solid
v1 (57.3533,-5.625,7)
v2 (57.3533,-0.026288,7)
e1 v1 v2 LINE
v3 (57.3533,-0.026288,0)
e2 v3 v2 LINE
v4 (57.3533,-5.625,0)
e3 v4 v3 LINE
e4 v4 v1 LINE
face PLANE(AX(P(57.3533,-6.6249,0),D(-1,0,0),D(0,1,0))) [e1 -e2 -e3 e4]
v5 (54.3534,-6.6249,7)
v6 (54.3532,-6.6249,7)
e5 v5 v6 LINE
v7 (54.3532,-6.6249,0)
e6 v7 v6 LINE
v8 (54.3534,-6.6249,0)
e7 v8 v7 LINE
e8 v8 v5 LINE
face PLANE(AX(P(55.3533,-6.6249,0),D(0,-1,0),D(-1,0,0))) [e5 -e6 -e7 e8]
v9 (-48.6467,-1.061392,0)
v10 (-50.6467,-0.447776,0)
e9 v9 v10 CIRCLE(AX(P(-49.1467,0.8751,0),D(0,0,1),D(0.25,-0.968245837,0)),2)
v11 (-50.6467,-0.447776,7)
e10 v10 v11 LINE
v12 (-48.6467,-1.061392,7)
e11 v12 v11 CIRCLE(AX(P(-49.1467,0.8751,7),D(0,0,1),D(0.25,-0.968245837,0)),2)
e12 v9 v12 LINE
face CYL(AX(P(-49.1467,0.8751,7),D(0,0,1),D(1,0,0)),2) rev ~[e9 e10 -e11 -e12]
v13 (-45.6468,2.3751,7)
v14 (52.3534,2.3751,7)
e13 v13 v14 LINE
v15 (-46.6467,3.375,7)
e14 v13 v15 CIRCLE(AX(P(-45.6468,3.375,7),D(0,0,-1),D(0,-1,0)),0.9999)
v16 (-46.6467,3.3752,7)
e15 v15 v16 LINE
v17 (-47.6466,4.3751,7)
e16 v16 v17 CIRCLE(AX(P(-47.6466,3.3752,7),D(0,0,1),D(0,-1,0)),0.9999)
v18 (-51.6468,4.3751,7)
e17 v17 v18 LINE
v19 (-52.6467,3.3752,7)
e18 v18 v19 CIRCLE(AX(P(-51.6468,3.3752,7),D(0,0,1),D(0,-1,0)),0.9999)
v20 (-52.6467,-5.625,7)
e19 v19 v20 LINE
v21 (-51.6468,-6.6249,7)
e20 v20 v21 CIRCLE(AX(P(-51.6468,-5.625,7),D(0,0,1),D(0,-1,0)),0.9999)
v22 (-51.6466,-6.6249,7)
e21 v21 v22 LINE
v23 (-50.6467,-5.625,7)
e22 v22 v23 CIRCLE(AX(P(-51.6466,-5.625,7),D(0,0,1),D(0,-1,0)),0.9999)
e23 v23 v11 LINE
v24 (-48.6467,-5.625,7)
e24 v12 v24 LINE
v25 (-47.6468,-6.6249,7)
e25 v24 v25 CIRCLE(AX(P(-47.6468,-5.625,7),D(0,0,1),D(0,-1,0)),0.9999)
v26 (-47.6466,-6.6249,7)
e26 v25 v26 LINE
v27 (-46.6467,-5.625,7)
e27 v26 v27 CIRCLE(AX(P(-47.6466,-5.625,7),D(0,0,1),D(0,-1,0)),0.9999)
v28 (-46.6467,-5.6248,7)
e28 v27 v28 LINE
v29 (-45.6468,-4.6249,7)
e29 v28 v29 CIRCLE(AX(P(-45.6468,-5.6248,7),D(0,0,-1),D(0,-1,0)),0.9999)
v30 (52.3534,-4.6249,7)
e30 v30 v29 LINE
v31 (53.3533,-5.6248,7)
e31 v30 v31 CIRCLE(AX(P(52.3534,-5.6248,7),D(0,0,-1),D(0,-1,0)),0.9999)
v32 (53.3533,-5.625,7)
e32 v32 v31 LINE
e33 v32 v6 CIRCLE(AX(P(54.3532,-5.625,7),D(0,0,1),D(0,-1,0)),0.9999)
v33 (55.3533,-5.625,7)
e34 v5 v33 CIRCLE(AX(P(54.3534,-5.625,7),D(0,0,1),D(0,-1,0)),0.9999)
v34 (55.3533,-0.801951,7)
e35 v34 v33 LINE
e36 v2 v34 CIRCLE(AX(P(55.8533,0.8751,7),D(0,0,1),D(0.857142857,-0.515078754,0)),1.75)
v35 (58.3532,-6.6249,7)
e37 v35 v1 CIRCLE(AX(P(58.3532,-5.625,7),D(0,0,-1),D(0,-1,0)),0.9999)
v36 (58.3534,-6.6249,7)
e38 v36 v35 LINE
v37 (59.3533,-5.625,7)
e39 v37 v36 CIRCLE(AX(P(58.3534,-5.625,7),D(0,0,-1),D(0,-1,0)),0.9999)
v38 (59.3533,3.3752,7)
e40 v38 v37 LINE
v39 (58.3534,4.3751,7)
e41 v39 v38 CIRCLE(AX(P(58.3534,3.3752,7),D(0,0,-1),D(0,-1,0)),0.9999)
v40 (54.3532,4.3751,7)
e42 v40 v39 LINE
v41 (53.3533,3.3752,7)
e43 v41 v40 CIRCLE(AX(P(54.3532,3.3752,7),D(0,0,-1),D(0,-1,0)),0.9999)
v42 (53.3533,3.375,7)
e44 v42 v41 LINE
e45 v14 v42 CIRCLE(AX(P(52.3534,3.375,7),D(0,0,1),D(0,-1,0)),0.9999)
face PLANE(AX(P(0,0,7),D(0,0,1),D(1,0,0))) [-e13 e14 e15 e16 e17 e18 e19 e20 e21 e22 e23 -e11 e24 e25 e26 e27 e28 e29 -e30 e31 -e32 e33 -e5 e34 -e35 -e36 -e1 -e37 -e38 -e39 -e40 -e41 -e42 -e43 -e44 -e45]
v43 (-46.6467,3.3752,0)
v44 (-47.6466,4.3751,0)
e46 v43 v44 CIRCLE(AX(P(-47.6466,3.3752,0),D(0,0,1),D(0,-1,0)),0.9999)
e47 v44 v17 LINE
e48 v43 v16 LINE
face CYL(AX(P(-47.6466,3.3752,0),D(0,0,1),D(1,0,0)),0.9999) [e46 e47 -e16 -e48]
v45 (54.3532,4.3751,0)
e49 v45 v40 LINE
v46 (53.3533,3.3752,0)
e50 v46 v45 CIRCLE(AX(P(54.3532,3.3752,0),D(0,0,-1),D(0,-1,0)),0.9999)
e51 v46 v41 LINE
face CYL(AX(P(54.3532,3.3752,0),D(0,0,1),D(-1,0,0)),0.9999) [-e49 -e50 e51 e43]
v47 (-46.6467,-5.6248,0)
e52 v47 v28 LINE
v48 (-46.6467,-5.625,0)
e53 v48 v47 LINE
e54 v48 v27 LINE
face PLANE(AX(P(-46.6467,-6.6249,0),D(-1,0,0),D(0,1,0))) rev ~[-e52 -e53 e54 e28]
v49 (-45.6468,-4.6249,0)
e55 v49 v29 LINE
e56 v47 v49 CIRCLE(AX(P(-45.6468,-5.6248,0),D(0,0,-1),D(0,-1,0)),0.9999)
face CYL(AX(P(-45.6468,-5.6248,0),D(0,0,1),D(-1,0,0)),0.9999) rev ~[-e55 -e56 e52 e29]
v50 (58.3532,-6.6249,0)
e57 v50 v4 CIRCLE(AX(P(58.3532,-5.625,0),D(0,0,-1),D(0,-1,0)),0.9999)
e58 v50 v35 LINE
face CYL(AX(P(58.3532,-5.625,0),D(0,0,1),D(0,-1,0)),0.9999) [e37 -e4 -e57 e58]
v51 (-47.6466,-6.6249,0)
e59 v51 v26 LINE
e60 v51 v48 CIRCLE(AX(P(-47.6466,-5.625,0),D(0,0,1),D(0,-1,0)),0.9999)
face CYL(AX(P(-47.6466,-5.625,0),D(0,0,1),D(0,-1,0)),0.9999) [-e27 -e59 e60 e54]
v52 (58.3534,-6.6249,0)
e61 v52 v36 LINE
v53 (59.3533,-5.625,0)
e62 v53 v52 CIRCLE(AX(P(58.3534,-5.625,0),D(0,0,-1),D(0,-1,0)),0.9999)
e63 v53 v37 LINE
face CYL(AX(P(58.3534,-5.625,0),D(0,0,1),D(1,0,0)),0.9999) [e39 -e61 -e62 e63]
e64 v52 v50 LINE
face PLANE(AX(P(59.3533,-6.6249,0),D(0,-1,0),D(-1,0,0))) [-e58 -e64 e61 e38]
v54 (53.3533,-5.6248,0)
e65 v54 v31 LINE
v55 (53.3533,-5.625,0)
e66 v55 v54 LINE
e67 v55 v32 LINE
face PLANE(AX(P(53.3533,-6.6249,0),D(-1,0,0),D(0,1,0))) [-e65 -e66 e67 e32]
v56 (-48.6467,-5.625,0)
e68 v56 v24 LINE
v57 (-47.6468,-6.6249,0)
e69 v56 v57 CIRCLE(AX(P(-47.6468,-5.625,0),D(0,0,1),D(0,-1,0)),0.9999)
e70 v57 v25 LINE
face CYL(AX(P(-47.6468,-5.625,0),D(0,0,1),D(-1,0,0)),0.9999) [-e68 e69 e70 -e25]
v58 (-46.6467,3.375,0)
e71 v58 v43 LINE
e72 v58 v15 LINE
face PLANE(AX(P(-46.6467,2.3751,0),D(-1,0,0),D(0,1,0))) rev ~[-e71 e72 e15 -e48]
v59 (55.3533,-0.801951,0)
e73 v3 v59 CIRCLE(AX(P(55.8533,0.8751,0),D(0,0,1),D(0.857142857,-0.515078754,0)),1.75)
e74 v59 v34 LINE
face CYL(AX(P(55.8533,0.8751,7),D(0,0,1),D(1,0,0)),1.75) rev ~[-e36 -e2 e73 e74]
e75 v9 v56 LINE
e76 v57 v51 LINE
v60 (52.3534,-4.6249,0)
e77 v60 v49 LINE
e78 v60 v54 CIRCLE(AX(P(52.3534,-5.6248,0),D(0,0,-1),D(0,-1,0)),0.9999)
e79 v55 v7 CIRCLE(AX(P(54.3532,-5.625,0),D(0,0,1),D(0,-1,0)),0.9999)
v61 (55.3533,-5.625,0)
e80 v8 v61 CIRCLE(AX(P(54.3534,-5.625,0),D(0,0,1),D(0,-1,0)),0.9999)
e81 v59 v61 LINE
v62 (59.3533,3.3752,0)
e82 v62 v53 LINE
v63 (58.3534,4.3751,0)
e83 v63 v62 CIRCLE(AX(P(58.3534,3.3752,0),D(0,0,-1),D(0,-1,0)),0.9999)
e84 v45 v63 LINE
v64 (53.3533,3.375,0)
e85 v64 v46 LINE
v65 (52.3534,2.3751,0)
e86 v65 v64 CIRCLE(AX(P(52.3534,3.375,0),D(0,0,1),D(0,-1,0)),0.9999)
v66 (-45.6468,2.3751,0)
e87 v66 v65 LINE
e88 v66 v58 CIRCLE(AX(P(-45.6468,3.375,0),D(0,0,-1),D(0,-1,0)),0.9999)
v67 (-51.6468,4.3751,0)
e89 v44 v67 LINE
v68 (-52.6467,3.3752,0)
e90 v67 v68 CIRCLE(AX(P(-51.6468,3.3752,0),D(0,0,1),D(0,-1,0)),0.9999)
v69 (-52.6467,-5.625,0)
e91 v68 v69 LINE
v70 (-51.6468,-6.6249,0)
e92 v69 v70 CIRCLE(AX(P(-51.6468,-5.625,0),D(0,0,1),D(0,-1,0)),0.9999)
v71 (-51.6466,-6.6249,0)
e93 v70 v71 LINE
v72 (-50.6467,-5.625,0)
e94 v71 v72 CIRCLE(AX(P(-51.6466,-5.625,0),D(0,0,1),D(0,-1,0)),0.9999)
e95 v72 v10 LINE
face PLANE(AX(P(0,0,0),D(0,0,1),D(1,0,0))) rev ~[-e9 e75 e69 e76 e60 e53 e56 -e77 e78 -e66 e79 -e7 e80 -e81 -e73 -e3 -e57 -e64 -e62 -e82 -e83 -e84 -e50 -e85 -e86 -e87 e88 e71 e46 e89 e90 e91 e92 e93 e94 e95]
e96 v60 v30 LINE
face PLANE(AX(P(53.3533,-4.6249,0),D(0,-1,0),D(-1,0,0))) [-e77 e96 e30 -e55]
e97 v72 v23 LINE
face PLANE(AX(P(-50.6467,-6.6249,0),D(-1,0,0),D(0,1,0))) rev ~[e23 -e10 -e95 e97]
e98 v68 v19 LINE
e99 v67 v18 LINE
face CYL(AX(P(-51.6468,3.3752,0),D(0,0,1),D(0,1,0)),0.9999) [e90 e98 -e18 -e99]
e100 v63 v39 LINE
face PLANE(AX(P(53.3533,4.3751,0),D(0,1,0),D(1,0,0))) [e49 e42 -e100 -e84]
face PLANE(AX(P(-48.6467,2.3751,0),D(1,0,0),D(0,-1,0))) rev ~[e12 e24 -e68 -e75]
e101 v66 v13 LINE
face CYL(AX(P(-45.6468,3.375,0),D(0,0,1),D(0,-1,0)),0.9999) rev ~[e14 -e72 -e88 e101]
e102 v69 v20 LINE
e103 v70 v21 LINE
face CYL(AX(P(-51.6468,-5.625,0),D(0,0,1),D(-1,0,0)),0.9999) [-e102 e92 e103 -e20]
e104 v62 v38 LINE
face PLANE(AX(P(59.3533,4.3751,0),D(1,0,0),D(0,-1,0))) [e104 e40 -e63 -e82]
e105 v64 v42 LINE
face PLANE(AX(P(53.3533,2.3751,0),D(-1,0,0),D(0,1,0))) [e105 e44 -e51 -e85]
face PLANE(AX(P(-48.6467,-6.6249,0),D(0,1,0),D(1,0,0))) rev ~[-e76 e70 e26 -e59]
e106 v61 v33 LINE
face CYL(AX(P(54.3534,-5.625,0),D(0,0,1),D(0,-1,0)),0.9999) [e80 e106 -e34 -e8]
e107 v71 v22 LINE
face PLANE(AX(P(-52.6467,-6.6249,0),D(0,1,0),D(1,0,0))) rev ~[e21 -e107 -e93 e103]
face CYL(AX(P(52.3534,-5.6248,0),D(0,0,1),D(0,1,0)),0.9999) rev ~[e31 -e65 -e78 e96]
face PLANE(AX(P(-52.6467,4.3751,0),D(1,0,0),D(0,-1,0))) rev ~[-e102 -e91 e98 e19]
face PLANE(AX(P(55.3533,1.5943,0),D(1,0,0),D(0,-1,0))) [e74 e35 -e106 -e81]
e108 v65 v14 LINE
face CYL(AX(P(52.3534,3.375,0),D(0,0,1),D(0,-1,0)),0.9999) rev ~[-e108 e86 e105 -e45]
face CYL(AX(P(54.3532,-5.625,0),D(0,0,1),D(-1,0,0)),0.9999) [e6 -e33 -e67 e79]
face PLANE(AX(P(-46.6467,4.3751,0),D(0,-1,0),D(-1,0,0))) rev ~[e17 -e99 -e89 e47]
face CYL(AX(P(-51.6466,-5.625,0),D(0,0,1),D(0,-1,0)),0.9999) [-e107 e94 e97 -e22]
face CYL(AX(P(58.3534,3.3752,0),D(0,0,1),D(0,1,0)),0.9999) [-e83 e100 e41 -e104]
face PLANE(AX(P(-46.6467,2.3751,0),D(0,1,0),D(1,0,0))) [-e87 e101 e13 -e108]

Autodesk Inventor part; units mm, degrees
ref_plane "YZ Plane" through (0, 0, 0) normal (1, 0, 0) x (0, 1, 0)
ref_plane "XZ Plane" through (0, 0, 0) normal (0, 1, 0) x (-1, 0, 0)
ref_plane "XY Plane" through (0, 0, 0) normal (0, 0, 1) x (1, 0, 0)
sketch "Náčrt1" plane through (0, 0, 0) normal (0, 0, 1) x (1, 0, 0)
  line L0 (-46.6467, 2.3751) -> (53.3533, 2.3751)
  line L1 (53.3533, 2.3751) -> (53.3533, -4.6249)
  line L2 (53.3533, -4.6249) -> (-46.6467, -4.6249)
  line L3 (-46.6467, -4.6249) -> (-46.6467, 2.3751)
  line L4 (-46.6467, 4.3751) -> (-52.6467, 4.3751)
  line L5 (-52.6467, 4.3751) -> (-52.6467, -6.6249)
  line L6 (-46.6467, -6.6249) -> (-46.6467, 4.3751)
  line L7 (-50.6467, 2.3751) -> (-48.6467, 2.3751)
  line L8 (-48.6467, 2.3751) -> (-48.6467, -6.6249)
  line L9 (-50.6467, -6.6249) -> (-50.6467, 2.3751)
  line L10 (-52.6467, -6.6249) -> (-50.6467, -6.6249)
  line L11 (-48.6467, -6.6249) -> (-46.6467, -6.6249)
  line L12 (53.3533, 4.3751) -> (59.3533, 4.3751)
  line L13 (59.3533, 4.3751) -> (59.3533, -6.6249)
  line L14 (53.3533, -6.6249) -> (53.3533, 4.3751)
  line L15 (57.3533, -6.6249) -> (57.3533, 1.5943)
  line L16 (57.3533, 1.5943) -> (55.3533, 1.5943)
  line L17 (55.3533, 1.5943) -> (55.3533, -6.6249)
  line L18 (59.3533, -6.6249) -> (57.3533, -6.6249)
  line L19 (55.3533, -6.6249) -> (53.3533, -6.6249)
  point P0 (0, 0)
  point P1 (-47.6467, -6.6249)
  point P2 (56.3533, 4.3751)
  point P3 (55.3533, -2.5153)
  point P4 (54.3533, -6.6249)
  dimension "d0" = 100
  dimension "d1" = 7
  dimension "d2" = 2
  dimension "d4" = 6
  dimension "d5" = 2
  dimension "d6" = 0
  dimension "d7" = 2
  dimension "d8" = 2
  dimension "d9" = 2
  dimension "d10" = 2
  dimension "d11" = 6
  dimension "d12" = 0
  dimension "d14" = 2
  dimension "d15" = 2
  dimension "d16" = 2
extrude "Vysunutí1" add sketch "Náčrt1" along normal blind 7
fillet "Zaoblení1" radius 1 3 edges at (-46.6467, 4.3751, 3.5) (-46.6467, 2.3751, 3.5) (-52.6467, 4.3751, 3.5)
fillet "Zaoblení2" radius 1 3 edges at (53.3533, 2.3751, 3.5) (53.3533, 4.3751, 3.5) (59.3533, 4.3751, 3.5)
fillet "Zaoblení3" radius 1 5 edges at (-46.6467, -4.6249, 3.5) (-46.6467, -6.6249, 3.5) (-48.6467, -6.6249, 3.5) (-50.6467, -6.6249, 3.5) (-52.6467, -6.6249, 3.5)
fillet "Zaoblení4" radius 1 5 edges at (53.3533, -6.6249, 3.5) (53.3533, -4.6249, 3.5) (55.3533, -6.6249, 3.5) (57.3533, -6.6249, 3.5) (59.3533, -6.6249, 3.5)
fillet "Zaoblení5" radius 1 4 edges at (-50.6467, 2.3751, 3.5) (-48.6467, 2.3751, 3.5) (55.3533, 1.5943, 3.5) (57.3533, 1.5943, 3.5)
sketch "Náčrt2" plane through (0, 0, 7) normal (0, 0, 1) x (1, 0, 0)
  circle A0 centre (-49.1467, 0.8751) radius 2
  line L0 (-52.6467, 3.3751) -> (-52.6467, -5.6249) projected
  line L1 (-47.6467, 4.3751) -> (-51.6467, 4.3751) projected
  circle A1 centre (55.8533, 0.8751) radius 1.75
  line L2 (59.3533, -5.6249) -> (59.3533, 3.3751) projected
  line L3 (58.3533, 4.3751) -> (54.3533, 4.3751) projected
  point P0 (0, 0)
  dimension "d24" = 4
  dimension "d25" = 3.5
  dimension "d26" = 3.5
  dimension "d27" = 3.5
  dimension "d28" = 3.5
  dimension "d29" = 3.5
extrude "Vysunutí2" cut sketch "Náčrt2" against normal through all
properties part number "rozpěrka"
